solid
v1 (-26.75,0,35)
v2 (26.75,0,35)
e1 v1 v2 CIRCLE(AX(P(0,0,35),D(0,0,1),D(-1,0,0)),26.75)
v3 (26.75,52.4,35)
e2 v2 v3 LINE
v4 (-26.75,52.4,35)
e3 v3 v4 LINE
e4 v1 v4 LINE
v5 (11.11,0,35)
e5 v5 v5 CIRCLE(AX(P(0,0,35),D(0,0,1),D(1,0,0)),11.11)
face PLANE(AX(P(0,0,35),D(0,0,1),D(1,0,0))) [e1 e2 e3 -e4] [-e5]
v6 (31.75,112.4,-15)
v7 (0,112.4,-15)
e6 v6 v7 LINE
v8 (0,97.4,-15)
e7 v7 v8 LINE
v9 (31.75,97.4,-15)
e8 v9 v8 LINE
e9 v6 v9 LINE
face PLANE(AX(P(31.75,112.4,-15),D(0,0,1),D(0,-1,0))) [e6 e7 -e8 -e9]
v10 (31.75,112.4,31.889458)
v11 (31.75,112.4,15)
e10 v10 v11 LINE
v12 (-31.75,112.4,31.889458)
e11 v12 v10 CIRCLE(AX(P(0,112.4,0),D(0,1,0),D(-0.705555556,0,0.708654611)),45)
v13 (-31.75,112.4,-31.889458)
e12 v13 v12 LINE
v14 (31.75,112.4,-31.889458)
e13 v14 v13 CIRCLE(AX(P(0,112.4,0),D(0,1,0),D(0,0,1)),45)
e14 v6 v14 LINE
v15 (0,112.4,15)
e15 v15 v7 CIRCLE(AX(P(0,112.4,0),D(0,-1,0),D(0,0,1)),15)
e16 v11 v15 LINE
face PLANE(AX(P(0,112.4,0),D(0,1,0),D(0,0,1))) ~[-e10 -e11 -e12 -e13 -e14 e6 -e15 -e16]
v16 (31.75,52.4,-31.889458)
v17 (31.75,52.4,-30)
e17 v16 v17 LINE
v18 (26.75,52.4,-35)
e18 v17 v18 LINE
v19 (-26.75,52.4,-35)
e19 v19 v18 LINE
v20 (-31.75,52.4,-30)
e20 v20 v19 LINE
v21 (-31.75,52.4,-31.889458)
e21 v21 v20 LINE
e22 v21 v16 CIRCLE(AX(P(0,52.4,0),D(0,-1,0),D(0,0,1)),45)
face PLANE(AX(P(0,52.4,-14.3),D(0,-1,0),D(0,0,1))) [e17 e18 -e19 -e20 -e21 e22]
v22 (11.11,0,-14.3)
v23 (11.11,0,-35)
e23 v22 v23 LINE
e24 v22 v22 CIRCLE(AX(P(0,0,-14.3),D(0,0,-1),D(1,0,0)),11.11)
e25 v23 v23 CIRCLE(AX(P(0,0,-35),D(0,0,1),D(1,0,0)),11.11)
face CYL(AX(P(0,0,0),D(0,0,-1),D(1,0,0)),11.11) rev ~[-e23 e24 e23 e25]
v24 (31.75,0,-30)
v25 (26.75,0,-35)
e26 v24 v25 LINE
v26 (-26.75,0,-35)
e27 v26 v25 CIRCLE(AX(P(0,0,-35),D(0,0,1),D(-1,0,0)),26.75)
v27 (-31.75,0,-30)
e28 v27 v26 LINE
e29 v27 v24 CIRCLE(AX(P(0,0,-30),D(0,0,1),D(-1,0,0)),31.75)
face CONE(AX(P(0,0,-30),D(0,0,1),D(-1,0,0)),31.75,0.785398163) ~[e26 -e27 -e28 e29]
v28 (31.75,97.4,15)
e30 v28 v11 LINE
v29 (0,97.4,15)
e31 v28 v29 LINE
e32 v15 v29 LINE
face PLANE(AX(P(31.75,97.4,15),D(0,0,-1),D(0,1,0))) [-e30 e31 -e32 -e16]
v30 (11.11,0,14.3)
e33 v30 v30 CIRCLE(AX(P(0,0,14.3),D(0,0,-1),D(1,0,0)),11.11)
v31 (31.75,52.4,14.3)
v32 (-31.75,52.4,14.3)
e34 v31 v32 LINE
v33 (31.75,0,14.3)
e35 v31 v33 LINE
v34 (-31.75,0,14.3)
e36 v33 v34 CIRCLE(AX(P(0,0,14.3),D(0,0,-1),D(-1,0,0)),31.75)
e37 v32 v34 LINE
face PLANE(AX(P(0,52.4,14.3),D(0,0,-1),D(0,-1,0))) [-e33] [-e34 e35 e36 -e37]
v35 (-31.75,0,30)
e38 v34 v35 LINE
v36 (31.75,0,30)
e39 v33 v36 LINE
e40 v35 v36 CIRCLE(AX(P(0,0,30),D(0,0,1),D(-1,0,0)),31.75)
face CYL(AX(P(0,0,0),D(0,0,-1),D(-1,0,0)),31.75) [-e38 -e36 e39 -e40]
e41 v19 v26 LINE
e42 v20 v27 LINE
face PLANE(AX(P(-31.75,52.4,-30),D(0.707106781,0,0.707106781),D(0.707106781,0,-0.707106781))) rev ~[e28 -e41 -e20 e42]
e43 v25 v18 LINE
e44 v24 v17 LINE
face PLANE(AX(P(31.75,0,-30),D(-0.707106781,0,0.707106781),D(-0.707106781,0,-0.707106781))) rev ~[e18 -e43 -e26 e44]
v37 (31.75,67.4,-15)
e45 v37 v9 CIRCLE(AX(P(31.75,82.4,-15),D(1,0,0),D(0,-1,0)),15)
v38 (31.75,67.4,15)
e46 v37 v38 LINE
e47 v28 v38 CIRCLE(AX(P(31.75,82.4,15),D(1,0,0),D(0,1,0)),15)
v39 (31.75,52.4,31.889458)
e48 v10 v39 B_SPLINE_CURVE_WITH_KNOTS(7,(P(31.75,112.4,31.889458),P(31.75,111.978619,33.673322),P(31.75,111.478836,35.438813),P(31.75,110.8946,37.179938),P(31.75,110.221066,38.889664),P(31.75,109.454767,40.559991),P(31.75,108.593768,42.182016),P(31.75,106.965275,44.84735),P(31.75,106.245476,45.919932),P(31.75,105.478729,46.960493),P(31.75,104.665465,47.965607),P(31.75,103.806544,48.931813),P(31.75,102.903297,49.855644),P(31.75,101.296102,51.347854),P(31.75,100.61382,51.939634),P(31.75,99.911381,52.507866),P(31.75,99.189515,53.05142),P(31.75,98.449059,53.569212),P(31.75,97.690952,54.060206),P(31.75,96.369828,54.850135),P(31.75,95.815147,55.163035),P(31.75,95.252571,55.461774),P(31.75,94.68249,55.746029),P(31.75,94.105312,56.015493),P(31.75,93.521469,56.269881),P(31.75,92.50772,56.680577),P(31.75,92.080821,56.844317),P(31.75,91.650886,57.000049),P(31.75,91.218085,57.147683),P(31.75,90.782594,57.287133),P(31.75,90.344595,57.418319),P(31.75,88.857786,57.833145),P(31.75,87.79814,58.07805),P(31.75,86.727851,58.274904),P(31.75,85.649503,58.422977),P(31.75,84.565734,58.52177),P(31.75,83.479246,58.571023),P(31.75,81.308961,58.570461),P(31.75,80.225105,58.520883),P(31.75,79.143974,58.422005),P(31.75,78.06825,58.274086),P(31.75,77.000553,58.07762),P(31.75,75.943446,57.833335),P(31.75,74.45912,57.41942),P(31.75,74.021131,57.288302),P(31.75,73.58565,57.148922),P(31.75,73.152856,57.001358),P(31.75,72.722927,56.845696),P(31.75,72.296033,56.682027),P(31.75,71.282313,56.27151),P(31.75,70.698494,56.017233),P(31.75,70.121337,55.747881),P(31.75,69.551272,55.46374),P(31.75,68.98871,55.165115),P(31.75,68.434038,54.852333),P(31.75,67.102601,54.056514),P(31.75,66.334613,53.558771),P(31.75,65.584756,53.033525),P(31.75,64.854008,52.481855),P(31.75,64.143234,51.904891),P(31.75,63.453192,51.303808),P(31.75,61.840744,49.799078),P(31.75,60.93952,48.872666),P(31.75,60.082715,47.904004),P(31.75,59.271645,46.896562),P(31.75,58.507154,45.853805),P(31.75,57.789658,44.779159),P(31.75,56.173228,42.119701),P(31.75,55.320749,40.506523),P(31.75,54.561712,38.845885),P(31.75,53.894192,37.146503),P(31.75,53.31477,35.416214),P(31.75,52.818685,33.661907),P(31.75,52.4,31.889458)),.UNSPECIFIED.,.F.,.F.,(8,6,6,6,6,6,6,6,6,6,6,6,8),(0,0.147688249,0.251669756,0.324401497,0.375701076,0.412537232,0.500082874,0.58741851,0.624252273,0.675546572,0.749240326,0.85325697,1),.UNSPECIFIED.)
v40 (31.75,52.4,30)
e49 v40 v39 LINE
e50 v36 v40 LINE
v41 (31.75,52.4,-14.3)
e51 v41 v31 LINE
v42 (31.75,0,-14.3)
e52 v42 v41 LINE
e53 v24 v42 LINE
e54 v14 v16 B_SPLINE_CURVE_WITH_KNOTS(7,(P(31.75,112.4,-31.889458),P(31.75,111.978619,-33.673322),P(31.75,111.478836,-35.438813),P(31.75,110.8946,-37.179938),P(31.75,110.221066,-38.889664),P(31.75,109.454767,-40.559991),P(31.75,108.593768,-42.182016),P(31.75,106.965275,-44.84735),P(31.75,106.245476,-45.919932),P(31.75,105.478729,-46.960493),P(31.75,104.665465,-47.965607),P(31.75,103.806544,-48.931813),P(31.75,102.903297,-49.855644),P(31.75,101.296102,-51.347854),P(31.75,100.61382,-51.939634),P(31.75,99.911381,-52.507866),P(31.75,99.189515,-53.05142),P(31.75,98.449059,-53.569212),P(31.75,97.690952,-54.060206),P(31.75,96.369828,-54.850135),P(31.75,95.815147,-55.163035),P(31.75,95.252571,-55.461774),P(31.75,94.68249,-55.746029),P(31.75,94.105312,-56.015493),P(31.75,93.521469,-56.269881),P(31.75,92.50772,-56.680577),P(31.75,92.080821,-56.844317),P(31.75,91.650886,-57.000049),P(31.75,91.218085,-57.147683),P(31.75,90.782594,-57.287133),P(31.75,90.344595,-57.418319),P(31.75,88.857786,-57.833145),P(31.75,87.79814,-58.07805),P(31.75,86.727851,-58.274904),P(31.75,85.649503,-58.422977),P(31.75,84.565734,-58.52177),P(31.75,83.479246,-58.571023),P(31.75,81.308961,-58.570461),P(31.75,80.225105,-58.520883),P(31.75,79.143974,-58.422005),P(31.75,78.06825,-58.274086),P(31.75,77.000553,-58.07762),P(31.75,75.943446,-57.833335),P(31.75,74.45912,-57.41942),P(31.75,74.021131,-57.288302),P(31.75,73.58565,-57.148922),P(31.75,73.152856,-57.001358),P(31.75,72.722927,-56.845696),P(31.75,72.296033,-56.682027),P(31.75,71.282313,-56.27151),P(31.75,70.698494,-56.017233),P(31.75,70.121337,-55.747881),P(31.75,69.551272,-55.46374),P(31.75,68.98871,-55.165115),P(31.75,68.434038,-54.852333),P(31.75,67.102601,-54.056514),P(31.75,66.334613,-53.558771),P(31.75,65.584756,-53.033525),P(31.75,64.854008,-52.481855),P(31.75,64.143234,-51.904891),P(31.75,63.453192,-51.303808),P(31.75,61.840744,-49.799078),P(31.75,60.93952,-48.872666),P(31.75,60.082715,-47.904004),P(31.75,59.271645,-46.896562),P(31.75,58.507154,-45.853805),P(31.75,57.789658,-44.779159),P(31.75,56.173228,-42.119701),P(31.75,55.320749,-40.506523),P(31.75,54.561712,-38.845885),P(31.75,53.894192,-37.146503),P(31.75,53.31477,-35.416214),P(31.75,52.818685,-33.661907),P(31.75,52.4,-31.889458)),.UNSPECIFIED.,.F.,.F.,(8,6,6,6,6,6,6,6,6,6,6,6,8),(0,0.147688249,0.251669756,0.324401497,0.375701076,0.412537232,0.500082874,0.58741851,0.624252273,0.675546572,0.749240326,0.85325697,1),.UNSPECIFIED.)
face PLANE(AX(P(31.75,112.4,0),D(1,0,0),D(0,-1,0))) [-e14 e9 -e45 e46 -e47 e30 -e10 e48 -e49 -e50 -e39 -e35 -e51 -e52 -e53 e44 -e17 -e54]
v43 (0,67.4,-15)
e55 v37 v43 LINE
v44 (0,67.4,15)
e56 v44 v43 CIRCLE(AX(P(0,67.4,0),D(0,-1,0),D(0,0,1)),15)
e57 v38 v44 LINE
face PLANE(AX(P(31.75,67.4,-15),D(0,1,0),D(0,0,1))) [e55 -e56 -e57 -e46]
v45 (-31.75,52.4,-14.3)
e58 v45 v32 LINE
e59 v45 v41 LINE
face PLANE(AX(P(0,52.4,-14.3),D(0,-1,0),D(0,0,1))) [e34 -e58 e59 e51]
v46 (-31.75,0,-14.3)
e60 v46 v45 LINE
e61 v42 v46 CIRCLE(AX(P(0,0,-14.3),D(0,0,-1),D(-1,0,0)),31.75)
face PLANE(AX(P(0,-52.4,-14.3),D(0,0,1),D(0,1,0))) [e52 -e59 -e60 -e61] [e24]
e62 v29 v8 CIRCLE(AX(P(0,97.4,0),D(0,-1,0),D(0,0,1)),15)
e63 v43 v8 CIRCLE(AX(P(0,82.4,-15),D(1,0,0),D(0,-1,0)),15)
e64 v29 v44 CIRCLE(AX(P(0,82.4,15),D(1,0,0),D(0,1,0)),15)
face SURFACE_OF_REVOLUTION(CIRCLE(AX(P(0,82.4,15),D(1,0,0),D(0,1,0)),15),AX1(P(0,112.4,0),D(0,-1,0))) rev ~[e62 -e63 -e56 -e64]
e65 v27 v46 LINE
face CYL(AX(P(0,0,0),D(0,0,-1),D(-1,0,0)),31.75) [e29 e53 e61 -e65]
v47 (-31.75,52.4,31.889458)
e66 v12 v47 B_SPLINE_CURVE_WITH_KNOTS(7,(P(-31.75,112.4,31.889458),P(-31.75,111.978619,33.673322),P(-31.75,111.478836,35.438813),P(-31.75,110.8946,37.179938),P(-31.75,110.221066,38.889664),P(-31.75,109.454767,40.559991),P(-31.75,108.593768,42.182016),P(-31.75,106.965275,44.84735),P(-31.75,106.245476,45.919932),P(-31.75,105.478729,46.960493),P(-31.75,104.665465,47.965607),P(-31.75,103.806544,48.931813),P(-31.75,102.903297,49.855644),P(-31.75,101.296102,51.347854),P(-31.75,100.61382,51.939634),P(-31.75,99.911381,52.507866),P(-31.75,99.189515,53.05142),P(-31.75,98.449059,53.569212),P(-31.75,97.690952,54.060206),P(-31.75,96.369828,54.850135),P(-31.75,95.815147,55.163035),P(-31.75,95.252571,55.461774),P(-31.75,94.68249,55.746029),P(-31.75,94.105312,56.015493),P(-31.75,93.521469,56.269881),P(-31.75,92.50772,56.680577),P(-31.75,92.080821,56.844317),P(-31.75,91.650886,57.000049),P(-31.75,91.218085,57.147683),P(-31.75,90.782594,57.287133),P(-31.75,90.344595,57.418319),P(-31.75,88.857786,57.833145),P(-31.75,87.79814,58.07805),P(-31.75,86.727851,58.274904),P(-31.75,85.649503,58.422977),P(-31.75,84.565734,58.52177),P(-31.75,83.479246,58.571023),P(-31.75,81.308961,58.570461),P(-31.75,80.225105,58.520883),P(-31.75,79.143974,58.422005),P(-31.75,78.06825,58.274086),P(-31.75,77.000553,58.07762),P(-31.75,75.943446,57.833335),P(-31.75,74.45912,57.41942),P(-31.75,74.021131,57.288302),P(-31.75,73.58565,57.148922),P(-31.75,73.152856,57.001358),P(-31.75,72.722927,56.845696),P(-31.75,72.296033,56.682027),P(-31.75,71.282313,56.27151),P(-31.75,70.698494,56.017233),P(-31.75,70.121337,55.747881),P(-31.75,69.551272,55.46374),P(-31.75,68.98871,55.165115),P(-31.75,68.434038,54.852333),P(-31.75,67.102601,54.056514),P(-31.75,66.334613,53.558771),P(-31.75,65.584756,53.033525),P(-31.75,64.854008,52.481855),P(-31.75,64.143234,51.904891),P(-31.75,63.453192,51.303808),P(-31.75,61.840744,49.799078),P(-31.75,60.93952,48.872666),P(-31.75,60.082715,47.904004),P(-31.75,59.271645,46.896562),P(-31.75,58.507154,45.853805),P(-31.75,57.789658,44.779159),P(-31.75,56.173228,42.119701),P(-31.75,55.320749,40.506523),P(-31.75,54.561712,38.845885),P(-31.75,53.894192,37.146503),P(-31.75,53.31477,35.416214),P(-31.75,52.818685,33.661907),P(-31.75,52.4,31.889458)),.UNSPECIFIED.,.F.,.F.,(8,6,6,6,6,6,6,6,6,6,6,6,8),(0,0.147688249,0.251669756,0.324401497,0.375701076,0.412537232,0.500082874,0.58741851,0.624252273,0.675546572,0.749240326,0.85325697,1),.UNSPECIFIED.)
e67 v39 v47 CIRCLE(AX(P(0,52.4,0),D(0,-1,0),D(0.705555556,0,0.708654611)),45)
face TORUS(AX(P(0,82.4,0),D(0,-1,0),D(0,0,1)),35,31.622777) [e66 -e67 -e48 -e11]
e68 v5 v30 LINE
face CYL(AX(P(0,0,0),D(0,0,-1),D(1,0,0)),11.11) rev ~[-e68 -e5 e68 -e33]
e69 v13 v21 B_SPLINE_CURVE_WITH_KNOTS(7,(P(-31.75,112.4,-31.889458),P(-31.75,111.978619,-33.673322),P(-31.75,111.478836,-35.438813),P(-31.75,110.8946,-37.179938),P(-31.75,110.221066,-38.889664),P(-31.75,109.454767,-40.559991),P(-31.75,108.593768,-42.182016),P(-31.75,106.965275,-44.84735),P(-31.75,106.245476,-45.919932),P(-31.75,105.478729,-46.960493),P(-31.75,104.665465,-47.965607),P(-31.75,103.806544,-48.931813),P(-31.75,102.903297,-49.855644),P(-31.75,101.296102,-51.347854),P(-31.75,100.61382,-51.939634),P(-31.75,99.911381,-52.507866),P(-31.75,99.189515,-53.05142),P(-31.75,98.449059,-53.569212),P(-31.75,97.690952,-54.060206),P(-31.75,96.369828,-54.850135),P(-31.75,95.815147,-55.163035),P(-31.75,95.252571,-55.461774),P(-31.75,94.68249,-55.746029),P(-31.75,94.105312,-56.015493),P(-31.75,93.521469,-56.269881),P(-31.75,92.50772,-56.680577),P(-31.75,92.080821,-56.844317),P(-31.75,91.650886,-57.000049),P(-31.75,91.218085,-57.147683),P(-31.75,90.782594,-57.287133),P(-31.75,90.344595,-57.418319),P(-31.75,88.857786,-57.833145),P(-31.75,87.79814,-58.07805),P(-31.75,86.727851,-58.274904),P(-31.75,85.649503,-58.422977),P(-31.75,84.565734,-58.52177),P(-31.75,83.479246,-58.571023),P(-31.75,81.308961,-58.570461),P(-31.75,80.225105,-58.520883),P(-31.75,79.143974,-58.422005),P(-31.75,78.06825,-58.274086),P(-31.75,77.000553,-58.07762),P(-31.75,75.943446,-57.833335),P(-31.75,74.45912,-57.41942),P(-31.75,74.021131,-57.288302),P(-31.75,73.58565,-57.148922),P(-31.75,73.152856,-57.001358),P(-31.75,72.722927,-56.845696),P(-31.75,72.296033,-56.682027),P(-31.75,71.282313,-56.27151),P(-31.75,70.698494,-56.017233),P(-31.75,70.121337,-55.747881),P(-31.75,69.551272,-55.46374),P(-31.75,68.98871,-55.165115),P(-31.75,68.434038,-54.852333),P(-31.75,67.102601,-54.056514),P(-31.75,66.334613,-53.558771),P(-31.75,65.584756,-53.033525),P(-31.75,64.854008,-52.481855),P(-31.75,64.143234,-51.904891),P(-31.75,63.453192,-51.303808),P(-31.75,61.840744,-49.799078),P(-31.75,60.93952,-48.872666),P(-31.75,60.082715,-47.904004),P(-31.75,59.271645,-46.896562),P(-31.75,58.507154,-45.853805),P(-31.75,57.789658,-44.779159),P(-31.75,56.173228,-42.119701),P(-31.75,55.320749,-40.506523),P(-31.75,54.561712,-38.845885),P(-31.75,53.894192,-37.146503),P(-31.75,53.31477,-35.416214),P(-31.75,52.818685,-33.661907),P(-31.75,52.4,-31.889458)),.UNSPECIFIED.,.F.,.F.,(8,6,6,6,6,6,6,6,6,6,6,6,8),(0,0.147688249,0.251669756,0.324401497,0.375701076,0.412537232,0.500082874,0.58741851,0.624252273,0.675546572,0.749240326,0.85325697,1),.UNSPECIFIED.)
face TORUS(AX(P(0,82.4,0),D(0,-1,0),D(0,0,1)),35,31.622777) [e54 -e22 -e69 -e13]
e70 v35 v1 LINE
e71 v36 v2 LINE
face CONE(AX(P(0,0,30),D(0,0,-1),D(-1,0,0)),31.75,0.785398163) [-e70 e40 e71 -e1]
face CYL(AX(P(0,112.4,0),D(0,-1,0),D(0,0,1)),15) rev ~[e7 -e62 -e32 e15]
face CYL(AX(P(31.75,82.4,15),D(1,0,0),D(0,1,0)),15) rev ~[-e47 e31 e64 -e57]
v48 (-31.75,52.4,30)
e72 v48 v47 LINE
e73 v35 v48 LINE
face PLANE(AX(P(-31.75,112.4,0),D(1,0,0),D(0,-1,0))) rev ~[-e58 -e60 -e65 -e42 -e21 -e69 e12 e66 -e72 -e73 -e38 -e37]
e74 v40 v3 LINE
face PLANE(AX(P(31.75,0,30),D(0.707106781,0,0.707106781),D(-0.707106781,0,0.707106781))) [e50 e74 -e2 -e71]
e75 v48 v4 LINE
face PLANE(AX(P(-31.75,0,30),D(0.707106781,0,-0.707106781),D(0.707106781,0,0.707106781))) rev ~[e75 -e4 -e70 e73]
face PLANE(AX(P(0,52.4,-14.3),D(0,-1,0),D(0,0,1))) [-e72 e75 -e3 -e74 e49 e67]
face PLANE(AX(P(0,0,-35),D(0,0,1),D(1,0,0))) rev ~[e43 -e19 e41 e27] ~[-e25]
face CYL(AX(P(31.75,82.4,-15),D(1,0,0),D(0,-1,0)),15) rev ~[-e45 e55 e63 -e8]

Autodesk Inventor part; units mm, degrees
ref_plane "YZ Plane" through (0, 0, 0) normal (1, 0, 0) x (0, 1, 0)
ref_plane "XZ Plane" through (0, 0, 0) normal (0, 1, 0) x (-1, 0, 0)
ref_plane "XY Plane" through (0, 0, 0) normal (0, 0, 1) x (1, 0, 0)
sketch "Sketch1" plane through (0, 0, 0) normal (0, 0, 1) x (1, 0, 0)
  circle A0 centre (0, 0) radius 11.11
  arc A1 (-31.75, 0) -> (31.75, 0) centre (0, 0) ccw
  line L0 (31.75, 0) -> (31.75, 52.4)
  line L1 (-31.75, 0) -> (-31.75, 52.4)
  line L2 (-31.75, 74.62) -> (31.75, 74.62) construction
  line L3 (-31.75, 112.4) -> (31.75, 112.4)
  line L4 (31.75, 52.4) -> (31.75, 112.4)
  line L5 (-31.75, 112.4) -> (-31.75, 52.4)
  point P0 (0, 74.62)
  dimension "d0" = 22.22
  dimension "d3" = 31.75
  dimension "d4" = 52.4
  dimension "d7" = 74.62
  dimension "d17" = 60
extrude "Extrusion1" add sketch "Sketch1" along normal mid plane 70
sketch "Sketch2" plane through (0, 0, 0) normal (1, 0, 0) x (0, 1, 0)
  line L0 (52.4, 14.3) -> (-52.4, 14.3)
  line L1 (-52.4, 14.3) -> (-52.4, -14.3)
  line L2 (-52.4, -14.3) -> (52.4, -14.3)
  line L3 (52.4, -14.3) -> (52.4, 14.3)
  line L4 (52.4, 14.3) -> (-52.4, -14.3) construction
  line L5 (-52.4, 14.3) -> (52.4, -14.3) construction
  point P0 (0, 0)
  dimension "d13" = 28.6
  dimension "d14" = 52.4
extrude "Extrusion2" cut sketch "Sketch2" along normal through all both and the other way through all
sketch "Sketch3" plane through (0, 0, 0) normal (1, 0, 0) x (0, 1, 0)
  line L0 (52.4, 14.3) -> (52.4, -14.3) projected
  line L1 (112.4, -35) -> (112.4, 35) projected
  line L2 (52.4, 14.3) -> (52.4, 35)
  line L3 (52.4, -14.3) -> (52.4, -35)
  line L4 (52.4, 0) -> (112.4, 0)
  line L5 (112.4, -35) -> (112.4, -45)
  line L6 (52.4, -35) -> (52.4, -45)
  line L7 (52.4, 35) -> (52.4, 45)
  line L8 (112.4, 35) -> (112.4, 45)
  arc A0 (52.4, -45) -> (112.4, -45) centre (82.4, -35) ccw
  line L9 (112.4, -35) -> (0, -35) projected
  arc A1 (112.4, 45) -> (52.4, 45) centre (82.4, 35) ccw
  point P0 (0, 0)
  dimension "d22" = 10
sketch "Sketch4" plane through (-31.75, 112.4, 35) normal (0, 1, 0) x (1, 0, 0)
  line L0 (0, 70) -> (0, 0) projected
  line L1 (63.5, 0) -> (0, 0) projected
  line L2 (63.5, 70) -> (63.5, 0) projected
  line L3 (0, 70) -> (63.5, 70) projected
  line L4 (15, 15) -> (15, 55)
  line L5 (15, 55) -> (48.5, 55)
  line L6 (48.5, 55) -> (48.5, 15)
  line L7 (48.5, 15) -> (15, 15)
  point P0 (31.75, 35)
  dimension "d19" = 15
extrude "Extrusion3" cut sketch "Sketch4" against normal up to surface (60 mm away)
revolve "Revolution1" add sketch "Sketch3" angle 360 about axis through (0, 52.4, 0) along (0, 1, 0) contours L2 L7 A1 L8 L1 L4 L0
chamfer "Chamfer1" distance 5 angle 45 6 edges at (31.75, 26.2, 35) (0, -31.75, 35) (-31.75, 26.2, 35) (31.75, 26.2, -35) (0, -31.75, -35) (-31.75, 26.2, -35)
sketch "Sketch5" plane through (0, 0, 0) normal (0, 0, 1) x (1, 0, 0)
  line L0 (31.75, 52.4) -> (31.75, 0) projected
  line L1 (31.75, 52.4) -> (91.75, 52.4)
  line L2 (91.75, 52.4) -> (91.75, 112.4)
  line L3 (91.75, 112.4) -> (31.75, 112.4)
  line L4 (31.75, 112.4) -> (31.75, 52.4)
  line L5 (45, 112.4) -> (-45, 112.4) construction
  line L6 (0, 52.4) -> (0, 112.4)
  line L7 (-31.75, 52.4) -> (-31.75, 0)
  line L8 (-31.75, 52.4) -> (-91.75, 52.4)
  line L9 (-91.75, 52.4) -> (-91.75, 112.4)
  line L10 (-91.75, 112.4) -> (-31.75, 112.4)
  line L11 (-31.75, 112.4) -> (-31.75, 52.4)
  line L12 (-45, 112.4) -> (45, 112.4) construction
  point P0 (0, 0)
  dimension "d28" = 60
extrude "Extrusion4" cut sketch "Sketch5" along normal through all both and the other way through all
sketch "Sketch6" plane through (0, 0, 0) normal (1, 0, 0) x (0, 1, 0)
  line L0 (112.4, 31.8895) -> (112.4, -31.8895) projected
  line L1 (112.4, 0) -> (112.4, 15)
  line L2 (112.4, 15) -> (97.4, 15)
  arc A0 (97.4, 15) -> (67.4, 15) centre (82.4, 15) ccw
  line L3 (112.4, 0) -> (67.4, 0)
  line L4 (67.4, 0) -> (67.4, 15)
  point P0 (0, 0)
  dimension "d31" = 15
  dimension "d32" = 15
  dimension "d34" = 15
revolve "Revolution2" cut sketch "Sketch6" angle 360 about axis through (0, 112.4, 0) along (0, -1, 0)
sketch "Sketch7" plane through (31.75, 0, 14.3) normal (1, 0, 0) x (0, 0, -1)
  line L0 (29.3, 67.4) -> (-0.7, 67.4) projected
  line L1 (29.3, 97.4) -> (-0.7, 97.4) construction
  arc A0 (-0.7, 97.4) -> (-0.7, 67.4) centre (-0.7, 82.4) ccw
  arc A1 (29.3, 67.4) -> (29.3, 97.4) centre (29.3, 82.4) ccw
  line L2 (46.1895, 112.4) -> (-17.5895, 112.4) construction
  line L3 (29.3, 112.4) -> (29.3, 97.4)
  line L4 (29.3, 112.4) -> (-0.7, 112.4)
  line L5 (-0.7, 97.4) -> (-0.7, 112.4)
  point P0 (14.3, 0)
extrude "Extrusion5" cut sketch "Sketch7" against normal up to surface (31.75 mm away)
properties part number "Clevis-Socket"
